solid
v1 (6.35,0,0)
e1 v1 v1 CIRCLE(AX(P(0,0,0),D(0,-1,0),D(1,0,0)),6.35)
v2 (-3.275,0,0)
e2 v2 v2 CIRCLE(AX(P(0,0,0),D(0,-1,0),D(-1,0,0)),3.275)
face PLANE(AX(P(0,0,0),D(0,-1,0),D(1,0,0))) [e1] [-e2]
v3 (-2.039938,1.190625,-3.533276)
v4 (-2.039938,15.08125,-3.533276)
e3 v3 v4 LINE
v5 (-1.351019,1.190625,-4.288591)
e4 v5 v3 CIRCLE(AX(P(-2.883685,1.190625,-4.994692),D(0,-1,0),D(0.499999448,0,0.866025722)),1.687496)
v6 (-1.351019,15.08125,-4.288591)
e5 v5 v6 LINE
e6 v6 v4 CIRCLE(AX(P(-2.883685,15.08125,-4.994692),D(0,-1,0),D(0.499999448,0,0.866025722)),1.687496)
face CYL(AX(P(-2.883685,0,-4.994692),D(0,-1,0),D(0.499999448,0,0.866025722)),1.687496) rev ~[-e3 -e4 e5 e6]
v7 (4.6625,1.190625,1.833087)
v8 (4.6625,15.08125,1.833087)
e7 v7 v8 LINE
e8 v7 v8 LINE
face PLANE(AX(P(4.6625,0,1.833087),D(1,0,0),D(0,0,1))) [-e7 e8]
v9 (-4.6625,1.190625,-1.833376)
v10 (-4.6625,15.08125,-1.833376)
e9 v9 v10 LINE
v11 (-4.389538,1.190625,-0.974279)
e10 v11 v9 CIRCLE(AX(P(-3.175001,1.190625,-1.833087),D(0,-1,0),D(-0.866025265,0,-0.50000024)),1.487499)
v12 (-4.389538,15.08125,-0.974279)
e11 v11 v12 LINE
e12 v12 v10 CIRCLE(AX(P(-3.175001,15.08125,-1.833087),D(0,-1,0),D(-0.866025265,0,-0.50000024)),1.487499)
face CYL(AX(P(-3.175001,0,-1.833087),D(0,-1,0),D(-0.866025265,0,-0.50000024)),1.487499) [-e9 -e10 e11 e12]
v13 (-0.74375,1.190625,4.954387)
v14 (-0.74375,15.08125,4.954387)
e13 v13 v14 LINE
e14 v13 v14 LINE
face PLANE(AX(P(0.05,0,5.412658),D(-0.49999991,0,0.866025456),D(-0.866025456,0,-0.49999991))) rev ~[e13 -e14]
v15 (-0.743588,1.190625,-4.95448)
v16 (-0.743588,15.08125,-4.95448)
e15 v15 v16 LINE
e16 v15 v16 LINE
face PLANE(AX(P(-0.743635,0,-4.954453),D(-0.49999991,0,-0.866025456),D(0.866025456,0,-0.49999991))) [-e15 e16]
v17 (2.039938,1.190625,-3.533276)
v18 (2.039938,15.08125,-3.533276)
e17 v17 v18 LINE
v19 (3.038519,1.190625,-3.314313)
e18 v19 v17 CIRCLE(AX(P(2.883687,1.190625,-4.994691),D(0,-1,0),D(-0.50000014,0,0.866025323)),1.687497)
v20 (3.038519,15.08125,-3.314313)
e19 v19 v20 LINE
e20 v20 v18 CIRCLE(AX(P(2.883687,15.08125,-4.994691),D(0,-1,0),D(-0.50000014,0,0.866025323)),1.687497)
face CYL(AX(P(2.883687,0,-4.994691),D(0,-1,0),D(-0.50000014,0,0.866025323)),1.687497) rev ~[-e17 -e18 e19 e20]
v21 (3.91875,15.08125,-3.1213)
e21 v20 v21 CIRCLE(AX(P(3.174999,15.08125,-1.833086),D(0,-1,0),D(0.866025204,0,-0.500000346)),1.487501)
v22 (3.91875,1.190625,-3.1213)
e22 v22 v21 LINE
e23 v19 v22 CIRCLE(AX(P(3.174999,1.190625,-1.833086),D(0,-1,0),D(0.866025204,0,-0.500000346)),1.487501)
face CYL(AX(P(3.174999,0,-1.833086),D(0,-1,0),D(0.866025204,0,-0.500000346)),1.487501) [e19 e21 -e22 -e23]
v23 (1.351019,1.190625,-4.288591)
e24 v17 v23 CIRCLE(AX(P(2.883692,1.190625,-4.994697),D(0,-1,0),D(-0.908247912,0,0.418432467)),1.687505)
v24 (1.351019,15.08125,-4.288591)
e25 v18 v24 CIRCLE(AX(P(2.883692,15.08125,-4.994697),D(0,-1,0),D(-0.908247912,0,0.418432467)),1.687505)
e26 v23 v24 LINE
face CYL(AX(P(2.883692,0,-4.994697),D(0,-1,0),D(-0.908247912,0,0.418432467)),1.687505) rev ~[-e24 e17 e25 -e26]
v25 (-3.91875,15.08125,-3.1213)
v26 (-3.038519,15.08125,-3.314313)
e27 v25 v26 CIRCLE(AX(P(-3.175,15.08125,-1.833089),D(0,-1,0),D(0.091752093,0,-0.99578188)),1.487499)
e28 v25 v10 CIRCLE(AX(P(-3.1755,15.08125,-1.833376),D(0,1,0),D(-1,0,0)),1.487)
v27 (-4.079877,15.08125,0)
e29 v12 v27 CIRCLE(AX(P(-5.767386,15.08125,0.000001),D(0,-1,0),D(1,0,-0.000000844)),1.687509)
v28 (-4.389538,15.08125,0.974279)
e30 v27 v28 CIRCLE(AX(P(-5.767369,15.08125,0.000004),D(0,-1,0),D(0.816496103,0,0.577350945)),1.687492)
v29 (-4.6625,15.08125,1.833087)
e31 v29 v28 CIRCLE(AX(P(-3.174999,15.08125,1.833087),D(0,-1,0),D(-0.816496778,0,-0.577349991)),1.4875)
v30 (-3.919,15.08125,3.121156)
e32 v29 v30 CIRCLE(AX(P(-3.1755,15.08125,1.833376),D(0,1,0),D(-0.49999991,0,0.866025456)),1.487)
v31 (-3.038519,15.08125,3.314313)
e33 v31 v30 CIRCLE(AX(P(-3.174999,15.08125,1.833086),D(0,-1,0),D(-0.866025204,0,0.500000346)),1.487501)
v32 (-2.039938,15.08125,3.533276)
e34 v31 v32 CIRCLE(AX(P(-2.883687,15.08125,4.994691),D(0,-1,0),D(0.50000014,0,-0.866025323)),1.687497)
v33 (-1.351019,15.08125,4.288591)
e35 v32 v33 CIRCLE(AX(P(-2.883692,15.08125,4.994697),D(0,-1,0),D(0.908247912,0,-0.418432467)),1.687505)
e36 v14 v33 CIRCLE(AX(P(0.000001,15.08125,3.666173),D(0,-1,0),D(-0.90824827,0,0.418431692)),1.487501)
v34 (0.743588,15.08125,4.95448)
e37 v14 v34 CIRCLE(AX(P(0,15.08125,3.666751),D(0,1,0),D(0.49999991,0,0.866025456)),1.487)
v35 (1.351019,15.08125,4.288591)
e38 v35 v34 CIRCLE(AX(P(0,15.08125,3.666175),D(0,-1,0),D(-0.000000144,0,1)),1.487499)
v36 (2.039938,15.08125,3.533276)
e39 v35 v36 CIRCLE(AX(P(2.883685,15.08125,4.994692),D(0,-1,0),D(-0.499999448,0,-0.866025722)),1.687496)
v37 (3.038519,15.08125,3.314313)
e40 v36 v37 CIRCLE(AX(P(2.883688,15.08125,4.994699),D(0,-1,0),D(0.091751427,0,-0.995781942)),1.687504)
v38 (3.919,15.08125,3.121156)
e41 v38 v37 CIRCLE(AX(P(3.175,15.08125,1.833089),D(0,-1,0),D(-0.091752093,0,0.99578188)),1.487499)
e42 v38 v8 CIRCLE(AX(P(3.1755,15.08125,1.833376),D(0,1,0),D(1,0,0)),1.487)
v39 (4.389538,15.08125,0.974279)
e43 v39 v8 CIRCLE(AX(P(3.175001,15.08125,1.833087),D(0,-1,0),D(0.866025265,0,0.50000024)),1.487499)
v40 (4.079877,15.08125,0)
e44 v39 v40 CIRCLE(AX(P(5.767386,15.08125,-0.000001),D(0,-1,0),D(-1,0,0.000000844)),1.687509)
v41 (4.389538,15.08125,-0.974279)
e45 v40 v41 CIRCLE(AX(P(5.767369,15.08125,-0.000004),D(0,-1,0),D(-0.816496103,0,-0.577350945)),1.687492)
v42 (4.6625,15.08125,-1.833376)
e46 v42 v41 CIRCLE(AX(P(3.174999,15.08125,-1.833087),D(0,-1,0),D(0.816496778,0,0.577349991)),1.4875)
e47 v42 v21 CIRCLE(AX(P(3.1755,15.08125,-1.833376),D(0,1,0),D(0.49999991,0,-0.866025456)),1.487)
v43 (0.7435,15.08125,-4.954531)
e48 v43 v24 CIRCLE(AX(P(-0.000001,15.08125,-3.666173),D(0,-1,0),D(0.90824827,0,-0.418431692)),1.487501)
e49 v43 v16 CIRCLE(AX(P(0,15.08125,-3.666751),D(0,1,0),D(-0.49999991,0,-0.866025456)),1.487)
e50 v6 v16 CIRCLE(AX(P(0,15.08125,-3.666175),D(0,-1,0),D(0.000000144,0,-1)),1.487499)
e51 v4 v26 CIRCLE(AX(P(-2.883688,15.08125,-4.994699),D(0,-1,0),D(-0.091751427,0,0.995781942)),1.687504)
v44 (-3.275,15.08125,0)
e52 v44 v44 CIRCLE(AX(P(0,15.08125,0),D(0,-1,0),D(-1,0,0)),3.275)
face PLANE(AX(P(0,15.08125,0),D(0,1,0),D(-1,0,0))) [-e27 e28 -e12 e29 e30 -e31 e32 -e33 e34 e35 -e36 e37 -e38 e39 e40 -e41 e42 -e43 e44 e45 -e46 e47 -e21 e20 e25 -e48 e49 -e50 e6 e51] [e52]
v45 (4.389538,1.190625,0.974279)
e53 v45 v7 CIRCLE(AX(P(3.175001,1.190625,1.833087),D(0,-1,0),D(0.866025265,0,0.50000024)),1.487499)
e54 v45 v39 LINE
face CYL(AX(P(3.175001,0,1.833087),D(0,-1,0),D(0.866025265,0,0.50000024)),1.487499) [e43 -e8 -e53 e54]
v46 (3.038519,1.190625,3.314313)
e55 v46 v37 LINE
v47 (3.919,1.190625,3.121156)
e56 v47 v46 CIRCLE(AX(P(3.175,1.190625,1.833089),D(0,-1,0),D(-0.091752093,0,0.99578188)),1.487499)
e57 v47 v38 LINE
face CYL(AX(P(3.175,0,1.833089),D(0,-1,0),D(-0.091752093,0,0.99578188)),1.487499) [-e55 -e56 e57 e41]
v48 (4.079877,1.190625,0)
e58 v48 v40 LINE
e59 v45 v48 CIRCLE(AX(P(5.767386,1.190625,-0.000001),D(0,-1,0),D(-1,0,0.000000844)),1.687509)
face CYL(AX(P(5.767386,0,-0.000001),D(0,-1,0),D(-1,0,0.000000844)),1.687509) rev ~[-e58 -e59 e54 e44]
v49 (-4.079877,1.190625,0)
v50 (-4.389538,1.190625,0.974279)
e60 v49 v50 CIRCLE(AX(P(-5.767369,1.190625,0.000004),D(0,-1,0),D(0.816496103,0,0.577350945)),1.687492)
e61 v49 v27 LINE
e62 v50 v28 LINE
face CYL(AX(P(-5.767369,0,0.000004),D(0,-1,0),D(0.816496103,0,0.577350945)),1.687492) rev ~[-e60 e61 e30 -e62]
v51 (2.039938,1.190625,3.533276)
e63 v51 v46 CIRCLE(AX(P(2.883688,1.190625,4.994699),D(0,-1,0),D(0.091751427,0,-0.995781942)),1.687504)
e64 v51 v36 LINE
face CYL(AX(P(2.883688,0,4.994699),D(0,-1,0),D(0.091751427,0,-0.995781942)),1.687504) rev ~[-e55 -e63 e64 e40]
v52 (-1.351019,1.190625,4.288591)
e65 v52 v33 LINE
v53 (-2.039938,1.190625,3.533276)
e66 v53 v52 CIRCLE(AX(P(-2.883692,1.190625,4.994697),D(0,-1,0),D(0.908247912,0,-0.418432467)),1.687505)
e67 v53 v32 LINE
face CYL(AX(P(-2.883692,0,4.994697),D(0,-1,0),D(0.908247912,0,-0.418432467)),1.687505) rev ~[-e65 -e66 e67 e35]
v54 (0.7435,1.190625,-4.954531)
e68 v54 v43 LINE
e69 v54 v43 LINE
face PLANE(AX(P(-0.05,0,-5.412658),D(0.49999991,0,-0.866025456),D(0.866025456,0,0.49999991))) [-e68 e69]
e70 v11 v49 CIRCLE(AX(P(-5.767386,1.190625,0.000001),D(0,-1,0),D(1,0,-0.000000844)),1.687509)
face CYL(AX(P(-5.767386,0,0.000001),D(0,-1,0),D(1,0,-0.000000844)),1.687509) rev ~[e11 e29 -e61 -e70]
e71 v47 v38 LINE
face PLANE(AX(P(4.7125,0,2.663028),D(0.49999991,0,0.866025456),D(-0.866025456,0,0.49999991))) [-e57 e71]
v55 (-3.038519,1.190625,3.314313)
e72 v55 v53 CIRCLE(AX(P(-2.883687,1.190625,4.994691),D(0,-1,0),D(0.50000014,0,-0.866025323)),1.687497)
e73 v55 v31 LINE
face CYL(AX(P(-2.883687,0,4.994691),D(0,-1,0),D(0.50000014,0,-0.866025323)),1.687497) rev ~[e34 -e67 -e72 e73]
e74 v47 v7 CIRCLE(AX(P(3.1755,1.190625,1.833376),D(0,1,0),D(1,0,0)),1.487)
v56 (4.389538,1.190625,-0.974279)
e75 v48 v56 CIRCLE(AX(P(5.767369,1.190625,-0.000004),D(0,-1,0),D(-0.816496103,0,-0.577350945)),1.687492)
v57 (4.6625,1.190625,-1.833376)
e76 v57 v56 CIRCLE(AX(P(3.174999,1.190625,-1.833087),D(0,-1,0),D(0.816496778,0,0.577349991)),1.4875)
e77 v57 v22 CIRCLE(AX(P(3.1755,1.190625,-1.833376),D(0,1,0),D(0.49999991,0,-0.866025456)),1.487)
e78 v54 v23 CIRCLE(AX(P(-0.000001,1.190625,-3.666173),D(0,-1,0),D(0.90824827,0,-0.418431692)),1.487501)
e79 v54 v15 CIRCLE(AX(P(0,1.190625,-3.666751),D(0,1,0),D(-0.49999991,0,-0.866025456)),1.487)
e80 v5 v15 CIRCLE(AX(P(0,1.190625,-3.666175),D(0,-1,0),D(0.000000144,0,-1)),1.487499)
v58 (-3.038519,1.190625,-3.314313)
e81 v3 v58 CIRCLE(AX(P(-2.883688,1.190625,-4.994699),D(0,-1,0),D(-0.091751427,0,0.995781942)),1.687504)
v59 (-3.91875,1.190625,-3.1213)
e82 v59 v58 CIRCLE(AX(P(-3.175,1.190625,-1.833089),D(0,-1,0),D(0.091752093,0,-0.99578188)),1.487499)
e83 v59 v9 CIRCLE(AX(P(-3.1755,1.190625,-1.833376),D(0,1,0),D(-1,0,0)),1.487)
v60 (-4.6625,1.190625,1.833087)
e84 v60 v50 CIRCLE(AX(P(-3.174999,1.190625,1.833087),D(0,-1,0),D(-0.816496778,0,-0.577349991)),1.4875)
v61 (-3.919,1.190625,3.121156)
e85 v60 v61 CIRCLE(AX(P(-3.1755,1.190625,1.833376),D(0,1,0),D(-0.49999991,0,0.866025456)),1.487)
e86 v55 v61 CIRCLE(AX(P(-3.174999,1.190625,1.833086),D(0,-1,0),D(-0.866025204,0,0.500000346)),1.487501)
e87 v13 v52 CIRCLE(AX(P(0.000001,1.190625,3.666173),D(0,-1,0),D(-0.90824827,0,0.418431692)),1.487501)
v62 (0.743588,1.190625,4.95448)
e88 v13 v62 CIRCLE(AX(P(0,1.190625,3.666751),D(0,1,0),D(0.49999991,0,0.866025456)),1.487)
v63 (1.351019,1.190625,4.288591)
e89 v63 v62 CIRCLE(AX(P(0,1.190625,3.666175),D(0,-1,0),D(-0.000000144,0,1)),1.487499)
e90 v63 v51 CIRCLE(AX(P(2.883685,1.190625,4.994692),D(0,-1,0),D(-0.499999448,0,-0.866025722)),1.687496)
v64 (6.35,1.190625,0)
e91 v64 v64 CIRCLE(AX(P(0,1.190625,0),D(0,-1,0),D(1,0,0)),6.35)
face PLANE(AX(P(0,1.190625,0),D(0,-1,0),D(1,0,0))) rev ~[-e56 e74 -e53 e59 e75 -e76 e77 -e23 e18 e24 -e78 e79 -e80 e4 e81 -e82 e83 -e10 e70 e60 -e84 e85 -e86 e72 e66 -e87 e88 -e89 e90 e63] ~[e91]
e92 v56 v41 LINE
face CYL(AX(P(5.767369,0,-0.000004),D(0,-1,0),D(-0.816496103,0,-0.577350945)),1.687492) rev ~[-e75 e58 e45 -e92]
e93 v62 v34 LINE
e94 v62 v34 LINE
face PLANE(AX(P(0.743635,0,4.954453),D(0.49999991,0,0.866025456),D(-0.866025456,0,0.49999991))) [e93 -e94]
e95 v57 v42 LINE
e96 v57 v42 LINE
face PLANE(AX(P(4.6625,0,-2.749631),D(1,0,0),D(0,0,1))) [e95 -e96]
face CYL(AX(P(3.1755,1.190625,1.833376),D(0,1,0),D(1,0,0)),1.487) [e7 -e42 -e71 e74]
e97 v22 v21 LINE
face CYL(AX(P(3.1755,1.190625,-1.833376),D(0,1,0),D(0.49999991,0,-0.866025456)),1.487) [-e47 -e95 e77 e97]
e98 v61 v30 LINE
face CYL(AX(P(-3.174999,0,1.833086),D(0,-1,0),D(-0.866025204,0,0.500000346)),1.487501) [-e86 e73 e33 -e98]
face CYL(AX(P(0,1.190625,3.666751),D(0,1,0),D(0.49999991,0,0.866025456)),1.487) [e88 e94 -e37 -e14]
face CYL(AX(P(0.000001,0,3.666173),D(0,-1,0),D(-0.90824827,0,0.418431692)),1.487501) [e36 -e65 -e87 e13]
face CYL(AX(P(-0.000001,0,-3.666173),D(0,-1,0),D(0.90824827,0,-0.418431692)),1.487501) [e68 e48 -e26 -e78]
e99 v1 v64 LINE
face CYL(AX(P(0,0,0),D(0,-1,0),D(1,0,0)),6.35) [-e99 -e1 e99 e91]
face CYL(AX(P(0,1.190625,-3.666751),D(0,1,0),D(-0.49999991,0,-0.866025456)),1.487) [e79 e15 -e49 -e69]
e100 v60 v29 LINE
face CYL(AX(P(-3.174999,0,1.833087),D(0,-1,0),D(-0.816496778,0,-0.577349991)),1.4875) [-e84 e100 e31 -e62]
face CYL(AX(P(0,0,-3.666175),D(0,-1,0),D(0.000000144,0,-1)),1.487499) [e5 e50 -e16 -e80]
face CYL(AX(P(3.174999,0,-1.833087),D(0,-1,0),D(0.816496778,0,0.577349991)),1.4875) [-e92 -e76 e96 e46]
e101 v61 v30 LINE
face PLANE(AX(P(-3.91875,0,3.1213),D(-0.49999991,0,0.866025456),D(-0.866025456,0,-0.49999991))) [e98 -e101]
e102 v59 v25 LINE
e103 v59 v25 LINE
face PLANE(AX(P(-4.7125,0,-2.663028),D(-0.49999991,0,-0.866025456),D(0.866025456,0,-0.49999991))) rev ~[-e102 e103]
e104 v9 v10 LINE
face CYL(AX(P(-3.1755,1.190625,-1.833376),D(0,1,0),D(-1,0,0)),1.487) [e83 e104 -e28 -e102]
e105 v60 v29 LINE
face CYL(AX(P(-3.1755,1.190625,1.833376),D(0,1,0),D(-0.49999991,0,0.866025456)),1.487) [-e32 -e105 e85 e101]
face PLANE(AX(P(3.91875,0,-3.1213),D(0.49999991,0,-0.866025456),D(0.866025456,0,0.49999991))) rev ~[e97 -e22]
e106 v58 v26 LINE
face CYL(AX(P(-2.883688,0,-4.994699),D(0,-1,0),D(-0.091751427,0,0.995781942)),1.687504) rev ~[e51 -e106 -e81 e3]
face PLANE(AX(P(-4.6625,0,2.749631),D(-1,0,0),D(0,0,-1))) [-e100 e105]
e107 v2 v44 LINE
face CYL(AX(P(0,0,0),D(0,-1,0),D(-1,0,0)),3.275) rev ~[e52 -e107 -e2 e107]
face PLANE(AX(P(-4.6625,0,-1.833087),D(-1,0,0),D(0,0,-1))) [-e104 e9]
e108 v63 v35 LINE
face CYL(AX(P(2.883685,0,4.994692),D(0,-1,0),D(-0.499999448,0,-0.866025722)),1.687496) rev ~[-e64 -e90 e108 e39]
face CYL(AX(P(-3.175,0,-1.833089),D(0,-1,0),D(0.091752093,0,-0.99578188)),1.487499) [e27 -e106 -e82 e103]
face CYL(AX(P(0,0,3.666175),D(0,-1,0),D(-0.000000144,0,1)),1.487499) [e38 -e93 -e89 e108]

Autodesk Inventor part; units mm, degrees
ref_plane "YZ Plane" through (0, 0, 0) normal (1, 0, 0) x (0, 1, 0)
ref_plane "XZ Plane" through (0, 0, 0) normal (0, 1, 0) x (-1, 0, 0)
ref_plane "XY Plane" through (0, 0, 0) normal (0, 0, 1) x (1, 0, 0)
sketch "Sketch1" plane through (0, 0, 0) normal (0, 1, 0) x (-1, 0, 0)
  circle A0 centre (0, 0) radius 3.175
  circle A1 centre (0, 0) radius 4.7625 construction
  circle A2 centre (0, 0) radius 7.9375 construction
  line L0 (0, 0) -> (4.7625, 0) construction
  line L1 (4.7625, -2.749631) -> (0, -5.499261)
  line L2 (0, -5.499261) -> (-4.7625, -2.749631)
  line L3 (-4.7625, -2.749631) -> (-4.7625, 2.749631)
  line L4 (-4.7625, 2.749631) -> (0, 5.499261)
  line L5 (0, 5.499261) -> (4.7625, 2.749631)
  line L6 (4.7625, 2.749631) -> (4.7625, -2.749631)
  arc A3 (4.471188, 0.916544) -> (4.179877, 0) centre (5.767377, 0) ccw
  line L7 (4.7625, 2.749631) -> (0, 0) construction
  arc A4 (4.471188, 0.916544) -> (4.549815, 2.626837) centre (3.175, 1.833087) ccw
  arc A5 (4.179877, 0) -> (4.471188, -0.916544) centre (5.767377, 0) ccw
  arc A6 (4.549815, -2.626837) -> (4.471188, -0.916544) centre (3.175, -1.833087) ccw
  arc A7 (4.549815, 2.626837) -> (3.029344, 3.413891) centre (3.175, 1.833087) ccw
  arc A8 (2.089938, 3.619879) -> (3.029344, 3.413891) centre (2.883688, 4.994695) ccw
  arc A9 (1.441844, 4.330434) -> (2.089938, 3.619879) centre (2.883688, 4.994695) ccw
  arc A10 (1.441844, 4.330434) -> (0, 5.253674) centre (0, 3.666174) ccw
  arc A11 (0, 5.253674) -> (-1.441844, 4.330434) centre (0, 3.666174) ccw
  arc A12 (-2.089938, 3.619879) -> (-1.441844, 4.330434) centre (-2.883688, 4.994695) ccw
  arc A13 (-3.029344, 3.413891) -> (-2.089938, 3.619879) centre (-2.883688, 4.994695) ccw
  arc A14 (-3.029344, 3.413891) -> (-4.549815, 2.626837) centre (-3.175, 1.833087) ccw
  arc A15 (-4.549815, 2.626837) -> (-4.471188, 0.916544) centre (-3.175, 1.833087) ccw
  arc A16 (-4.179877, 0) -> (-4.471188, 0.916544) centre (-5.767377, 0) ccw
  arc A17 (-4.471188, -0.916544) -> (-4.179877, 0) centre (-5.767377, 0) ccw
  arc A18 (-4.471188, -0.916544) -> (-4.549815, -2.626837) centre (-3.175, -1.833087) ccw
  arc A19 (-4.549815, -2.626837) -> (-3.029344, -3.413891) centre (-3.175, -1.833087) ccw
  arc A20 (-2.089938, -3.619879) -> (-3.029344, -3.413891) centre (-2.883688, -4.994695) ccw
  arc A21 (-1.441844, -4.330434) -> (-2.089938, -3.619879) centre (-2.883688, -4.994695) ccw
  arc A22 (-1.441844, -4.330434) -> (0, -5.253674) centre (0, -3.666174) ccw
  arc A23 (0, -5.253674) -> (1.441844, -4.330434) centre (0, -3.666174) ccw
  arc A24 (2.089938, -3.619879) -> (1.441844, -4.330434) centre (2.883688, -4.994695) ccw
  arc A25 (3.029344, -3.413891) -> (2.089938, -3.619879) centre (2.883688, -4.994695) ccw
  arc A26 (3.029344, -3.413891) -> (4.549815, -2.626837) centre (3.175, -1.833087) ccw
  point P0 (2.38125, -4.124446)
  point P1 (4.7625, 1.833087)
  point P2 (3.96875, 3.207902)
  point P3 (0.79375, 5.04099)
  point P4 (-0.79375, 5.04099)
  point P5 (-3.96875, 3.207902)
  point P6 (-4.7625, 1.833087)
  point P7 (-4.7625, -1.833087)
  point P8 (-3.96875, -3.207902)
  point P9 (-0.79375, -5.04099)
  point P10 (0.79375, -5.04099)
  point P11 (3.96875, -3.207902)
  point P12 (4.7625, -1.833087)
  dimension "d0" = 6.35
  dimension "d1" = 9.525
  dimension "d2" = 15.875
  dimension "d30" = 1.5875
  dimension "d31" = 1.5875
  dimension "d34" = 360
extrude "Extrusion1" add sketch "Sketch1" along normal blind 15.08125 contours L1 A26 A6 L6 | A26 A25 A24 A23 A22 A21 A20 A19 A18 A17 A16 A15 A14 A13 A12 A11 A10 A9 A8 A7 A4 A3 A5 A6 | L1 L2 A22 A23 | A4 A7 L5 L6 | L2 L3 A18 A19 | A10 A11 L4 L5 | L3 L4 A14 A15
sketch "Sketch2" plane through (0, 0, 0) normal (0, -1, 0) x (1, 0, 0)
  circle A0 centre (0, 0) radius 3.175 projected
  circle A1 centre (0, 0) radius 6.35
  dimension "d26" = 12.7
extrude "Extrusion2" add sketch "Sketch2" against normal blind 1.190625
fillet "Fillet1" radius 1.5875 6 edges at (4.7625, 8.1359, 2.7496) (0, 8.1359, 5.4993) (-4.7625, 8.1359, 2.7496) (-4.7625, 8.1359, -2.7496) (0, 8.1359, -5.4993) (4.7625, 8.1359, -2.7496)
thread "Thread1" size "1/4-20 UNC" class "2B" standard "ANSI Unified Screw Threads" full length
thicken "Thicken1" operation add thickness 0.1 both sides no extend neighbours yes toward (-0.4640544, 0, -0.8858067) faces at (2.147002, 10.451042, 3.588477) (3.46181, 10.451042, 3.394463) (-1.208786, 5.820833, 4.695248) (4.40042, 5.820833, 0.807208) (-2.899273, 5.820833, 3.407271) (4.670597, 5.820833, -1.300784) (-4.584052, 5.820833, 1.101835) (1.826502, 10.451042, -3.810417) (-4.338852, 10.451042, -0.692439) (1.337809, 5.820833, -4.520822) (-4.747675, 5.820833, -1.616636) (-1.501147, 5.820833, -4.214479)
thicken "Thicken2" operation add thickness 0.1 both sides no extend neighbours yes toward (-0.9967573, 0, 0.0804666) faces at (-3.164704, 10.054167, 0.255481)
properties part number "Slider" material "Brass, Soft Yellow"
